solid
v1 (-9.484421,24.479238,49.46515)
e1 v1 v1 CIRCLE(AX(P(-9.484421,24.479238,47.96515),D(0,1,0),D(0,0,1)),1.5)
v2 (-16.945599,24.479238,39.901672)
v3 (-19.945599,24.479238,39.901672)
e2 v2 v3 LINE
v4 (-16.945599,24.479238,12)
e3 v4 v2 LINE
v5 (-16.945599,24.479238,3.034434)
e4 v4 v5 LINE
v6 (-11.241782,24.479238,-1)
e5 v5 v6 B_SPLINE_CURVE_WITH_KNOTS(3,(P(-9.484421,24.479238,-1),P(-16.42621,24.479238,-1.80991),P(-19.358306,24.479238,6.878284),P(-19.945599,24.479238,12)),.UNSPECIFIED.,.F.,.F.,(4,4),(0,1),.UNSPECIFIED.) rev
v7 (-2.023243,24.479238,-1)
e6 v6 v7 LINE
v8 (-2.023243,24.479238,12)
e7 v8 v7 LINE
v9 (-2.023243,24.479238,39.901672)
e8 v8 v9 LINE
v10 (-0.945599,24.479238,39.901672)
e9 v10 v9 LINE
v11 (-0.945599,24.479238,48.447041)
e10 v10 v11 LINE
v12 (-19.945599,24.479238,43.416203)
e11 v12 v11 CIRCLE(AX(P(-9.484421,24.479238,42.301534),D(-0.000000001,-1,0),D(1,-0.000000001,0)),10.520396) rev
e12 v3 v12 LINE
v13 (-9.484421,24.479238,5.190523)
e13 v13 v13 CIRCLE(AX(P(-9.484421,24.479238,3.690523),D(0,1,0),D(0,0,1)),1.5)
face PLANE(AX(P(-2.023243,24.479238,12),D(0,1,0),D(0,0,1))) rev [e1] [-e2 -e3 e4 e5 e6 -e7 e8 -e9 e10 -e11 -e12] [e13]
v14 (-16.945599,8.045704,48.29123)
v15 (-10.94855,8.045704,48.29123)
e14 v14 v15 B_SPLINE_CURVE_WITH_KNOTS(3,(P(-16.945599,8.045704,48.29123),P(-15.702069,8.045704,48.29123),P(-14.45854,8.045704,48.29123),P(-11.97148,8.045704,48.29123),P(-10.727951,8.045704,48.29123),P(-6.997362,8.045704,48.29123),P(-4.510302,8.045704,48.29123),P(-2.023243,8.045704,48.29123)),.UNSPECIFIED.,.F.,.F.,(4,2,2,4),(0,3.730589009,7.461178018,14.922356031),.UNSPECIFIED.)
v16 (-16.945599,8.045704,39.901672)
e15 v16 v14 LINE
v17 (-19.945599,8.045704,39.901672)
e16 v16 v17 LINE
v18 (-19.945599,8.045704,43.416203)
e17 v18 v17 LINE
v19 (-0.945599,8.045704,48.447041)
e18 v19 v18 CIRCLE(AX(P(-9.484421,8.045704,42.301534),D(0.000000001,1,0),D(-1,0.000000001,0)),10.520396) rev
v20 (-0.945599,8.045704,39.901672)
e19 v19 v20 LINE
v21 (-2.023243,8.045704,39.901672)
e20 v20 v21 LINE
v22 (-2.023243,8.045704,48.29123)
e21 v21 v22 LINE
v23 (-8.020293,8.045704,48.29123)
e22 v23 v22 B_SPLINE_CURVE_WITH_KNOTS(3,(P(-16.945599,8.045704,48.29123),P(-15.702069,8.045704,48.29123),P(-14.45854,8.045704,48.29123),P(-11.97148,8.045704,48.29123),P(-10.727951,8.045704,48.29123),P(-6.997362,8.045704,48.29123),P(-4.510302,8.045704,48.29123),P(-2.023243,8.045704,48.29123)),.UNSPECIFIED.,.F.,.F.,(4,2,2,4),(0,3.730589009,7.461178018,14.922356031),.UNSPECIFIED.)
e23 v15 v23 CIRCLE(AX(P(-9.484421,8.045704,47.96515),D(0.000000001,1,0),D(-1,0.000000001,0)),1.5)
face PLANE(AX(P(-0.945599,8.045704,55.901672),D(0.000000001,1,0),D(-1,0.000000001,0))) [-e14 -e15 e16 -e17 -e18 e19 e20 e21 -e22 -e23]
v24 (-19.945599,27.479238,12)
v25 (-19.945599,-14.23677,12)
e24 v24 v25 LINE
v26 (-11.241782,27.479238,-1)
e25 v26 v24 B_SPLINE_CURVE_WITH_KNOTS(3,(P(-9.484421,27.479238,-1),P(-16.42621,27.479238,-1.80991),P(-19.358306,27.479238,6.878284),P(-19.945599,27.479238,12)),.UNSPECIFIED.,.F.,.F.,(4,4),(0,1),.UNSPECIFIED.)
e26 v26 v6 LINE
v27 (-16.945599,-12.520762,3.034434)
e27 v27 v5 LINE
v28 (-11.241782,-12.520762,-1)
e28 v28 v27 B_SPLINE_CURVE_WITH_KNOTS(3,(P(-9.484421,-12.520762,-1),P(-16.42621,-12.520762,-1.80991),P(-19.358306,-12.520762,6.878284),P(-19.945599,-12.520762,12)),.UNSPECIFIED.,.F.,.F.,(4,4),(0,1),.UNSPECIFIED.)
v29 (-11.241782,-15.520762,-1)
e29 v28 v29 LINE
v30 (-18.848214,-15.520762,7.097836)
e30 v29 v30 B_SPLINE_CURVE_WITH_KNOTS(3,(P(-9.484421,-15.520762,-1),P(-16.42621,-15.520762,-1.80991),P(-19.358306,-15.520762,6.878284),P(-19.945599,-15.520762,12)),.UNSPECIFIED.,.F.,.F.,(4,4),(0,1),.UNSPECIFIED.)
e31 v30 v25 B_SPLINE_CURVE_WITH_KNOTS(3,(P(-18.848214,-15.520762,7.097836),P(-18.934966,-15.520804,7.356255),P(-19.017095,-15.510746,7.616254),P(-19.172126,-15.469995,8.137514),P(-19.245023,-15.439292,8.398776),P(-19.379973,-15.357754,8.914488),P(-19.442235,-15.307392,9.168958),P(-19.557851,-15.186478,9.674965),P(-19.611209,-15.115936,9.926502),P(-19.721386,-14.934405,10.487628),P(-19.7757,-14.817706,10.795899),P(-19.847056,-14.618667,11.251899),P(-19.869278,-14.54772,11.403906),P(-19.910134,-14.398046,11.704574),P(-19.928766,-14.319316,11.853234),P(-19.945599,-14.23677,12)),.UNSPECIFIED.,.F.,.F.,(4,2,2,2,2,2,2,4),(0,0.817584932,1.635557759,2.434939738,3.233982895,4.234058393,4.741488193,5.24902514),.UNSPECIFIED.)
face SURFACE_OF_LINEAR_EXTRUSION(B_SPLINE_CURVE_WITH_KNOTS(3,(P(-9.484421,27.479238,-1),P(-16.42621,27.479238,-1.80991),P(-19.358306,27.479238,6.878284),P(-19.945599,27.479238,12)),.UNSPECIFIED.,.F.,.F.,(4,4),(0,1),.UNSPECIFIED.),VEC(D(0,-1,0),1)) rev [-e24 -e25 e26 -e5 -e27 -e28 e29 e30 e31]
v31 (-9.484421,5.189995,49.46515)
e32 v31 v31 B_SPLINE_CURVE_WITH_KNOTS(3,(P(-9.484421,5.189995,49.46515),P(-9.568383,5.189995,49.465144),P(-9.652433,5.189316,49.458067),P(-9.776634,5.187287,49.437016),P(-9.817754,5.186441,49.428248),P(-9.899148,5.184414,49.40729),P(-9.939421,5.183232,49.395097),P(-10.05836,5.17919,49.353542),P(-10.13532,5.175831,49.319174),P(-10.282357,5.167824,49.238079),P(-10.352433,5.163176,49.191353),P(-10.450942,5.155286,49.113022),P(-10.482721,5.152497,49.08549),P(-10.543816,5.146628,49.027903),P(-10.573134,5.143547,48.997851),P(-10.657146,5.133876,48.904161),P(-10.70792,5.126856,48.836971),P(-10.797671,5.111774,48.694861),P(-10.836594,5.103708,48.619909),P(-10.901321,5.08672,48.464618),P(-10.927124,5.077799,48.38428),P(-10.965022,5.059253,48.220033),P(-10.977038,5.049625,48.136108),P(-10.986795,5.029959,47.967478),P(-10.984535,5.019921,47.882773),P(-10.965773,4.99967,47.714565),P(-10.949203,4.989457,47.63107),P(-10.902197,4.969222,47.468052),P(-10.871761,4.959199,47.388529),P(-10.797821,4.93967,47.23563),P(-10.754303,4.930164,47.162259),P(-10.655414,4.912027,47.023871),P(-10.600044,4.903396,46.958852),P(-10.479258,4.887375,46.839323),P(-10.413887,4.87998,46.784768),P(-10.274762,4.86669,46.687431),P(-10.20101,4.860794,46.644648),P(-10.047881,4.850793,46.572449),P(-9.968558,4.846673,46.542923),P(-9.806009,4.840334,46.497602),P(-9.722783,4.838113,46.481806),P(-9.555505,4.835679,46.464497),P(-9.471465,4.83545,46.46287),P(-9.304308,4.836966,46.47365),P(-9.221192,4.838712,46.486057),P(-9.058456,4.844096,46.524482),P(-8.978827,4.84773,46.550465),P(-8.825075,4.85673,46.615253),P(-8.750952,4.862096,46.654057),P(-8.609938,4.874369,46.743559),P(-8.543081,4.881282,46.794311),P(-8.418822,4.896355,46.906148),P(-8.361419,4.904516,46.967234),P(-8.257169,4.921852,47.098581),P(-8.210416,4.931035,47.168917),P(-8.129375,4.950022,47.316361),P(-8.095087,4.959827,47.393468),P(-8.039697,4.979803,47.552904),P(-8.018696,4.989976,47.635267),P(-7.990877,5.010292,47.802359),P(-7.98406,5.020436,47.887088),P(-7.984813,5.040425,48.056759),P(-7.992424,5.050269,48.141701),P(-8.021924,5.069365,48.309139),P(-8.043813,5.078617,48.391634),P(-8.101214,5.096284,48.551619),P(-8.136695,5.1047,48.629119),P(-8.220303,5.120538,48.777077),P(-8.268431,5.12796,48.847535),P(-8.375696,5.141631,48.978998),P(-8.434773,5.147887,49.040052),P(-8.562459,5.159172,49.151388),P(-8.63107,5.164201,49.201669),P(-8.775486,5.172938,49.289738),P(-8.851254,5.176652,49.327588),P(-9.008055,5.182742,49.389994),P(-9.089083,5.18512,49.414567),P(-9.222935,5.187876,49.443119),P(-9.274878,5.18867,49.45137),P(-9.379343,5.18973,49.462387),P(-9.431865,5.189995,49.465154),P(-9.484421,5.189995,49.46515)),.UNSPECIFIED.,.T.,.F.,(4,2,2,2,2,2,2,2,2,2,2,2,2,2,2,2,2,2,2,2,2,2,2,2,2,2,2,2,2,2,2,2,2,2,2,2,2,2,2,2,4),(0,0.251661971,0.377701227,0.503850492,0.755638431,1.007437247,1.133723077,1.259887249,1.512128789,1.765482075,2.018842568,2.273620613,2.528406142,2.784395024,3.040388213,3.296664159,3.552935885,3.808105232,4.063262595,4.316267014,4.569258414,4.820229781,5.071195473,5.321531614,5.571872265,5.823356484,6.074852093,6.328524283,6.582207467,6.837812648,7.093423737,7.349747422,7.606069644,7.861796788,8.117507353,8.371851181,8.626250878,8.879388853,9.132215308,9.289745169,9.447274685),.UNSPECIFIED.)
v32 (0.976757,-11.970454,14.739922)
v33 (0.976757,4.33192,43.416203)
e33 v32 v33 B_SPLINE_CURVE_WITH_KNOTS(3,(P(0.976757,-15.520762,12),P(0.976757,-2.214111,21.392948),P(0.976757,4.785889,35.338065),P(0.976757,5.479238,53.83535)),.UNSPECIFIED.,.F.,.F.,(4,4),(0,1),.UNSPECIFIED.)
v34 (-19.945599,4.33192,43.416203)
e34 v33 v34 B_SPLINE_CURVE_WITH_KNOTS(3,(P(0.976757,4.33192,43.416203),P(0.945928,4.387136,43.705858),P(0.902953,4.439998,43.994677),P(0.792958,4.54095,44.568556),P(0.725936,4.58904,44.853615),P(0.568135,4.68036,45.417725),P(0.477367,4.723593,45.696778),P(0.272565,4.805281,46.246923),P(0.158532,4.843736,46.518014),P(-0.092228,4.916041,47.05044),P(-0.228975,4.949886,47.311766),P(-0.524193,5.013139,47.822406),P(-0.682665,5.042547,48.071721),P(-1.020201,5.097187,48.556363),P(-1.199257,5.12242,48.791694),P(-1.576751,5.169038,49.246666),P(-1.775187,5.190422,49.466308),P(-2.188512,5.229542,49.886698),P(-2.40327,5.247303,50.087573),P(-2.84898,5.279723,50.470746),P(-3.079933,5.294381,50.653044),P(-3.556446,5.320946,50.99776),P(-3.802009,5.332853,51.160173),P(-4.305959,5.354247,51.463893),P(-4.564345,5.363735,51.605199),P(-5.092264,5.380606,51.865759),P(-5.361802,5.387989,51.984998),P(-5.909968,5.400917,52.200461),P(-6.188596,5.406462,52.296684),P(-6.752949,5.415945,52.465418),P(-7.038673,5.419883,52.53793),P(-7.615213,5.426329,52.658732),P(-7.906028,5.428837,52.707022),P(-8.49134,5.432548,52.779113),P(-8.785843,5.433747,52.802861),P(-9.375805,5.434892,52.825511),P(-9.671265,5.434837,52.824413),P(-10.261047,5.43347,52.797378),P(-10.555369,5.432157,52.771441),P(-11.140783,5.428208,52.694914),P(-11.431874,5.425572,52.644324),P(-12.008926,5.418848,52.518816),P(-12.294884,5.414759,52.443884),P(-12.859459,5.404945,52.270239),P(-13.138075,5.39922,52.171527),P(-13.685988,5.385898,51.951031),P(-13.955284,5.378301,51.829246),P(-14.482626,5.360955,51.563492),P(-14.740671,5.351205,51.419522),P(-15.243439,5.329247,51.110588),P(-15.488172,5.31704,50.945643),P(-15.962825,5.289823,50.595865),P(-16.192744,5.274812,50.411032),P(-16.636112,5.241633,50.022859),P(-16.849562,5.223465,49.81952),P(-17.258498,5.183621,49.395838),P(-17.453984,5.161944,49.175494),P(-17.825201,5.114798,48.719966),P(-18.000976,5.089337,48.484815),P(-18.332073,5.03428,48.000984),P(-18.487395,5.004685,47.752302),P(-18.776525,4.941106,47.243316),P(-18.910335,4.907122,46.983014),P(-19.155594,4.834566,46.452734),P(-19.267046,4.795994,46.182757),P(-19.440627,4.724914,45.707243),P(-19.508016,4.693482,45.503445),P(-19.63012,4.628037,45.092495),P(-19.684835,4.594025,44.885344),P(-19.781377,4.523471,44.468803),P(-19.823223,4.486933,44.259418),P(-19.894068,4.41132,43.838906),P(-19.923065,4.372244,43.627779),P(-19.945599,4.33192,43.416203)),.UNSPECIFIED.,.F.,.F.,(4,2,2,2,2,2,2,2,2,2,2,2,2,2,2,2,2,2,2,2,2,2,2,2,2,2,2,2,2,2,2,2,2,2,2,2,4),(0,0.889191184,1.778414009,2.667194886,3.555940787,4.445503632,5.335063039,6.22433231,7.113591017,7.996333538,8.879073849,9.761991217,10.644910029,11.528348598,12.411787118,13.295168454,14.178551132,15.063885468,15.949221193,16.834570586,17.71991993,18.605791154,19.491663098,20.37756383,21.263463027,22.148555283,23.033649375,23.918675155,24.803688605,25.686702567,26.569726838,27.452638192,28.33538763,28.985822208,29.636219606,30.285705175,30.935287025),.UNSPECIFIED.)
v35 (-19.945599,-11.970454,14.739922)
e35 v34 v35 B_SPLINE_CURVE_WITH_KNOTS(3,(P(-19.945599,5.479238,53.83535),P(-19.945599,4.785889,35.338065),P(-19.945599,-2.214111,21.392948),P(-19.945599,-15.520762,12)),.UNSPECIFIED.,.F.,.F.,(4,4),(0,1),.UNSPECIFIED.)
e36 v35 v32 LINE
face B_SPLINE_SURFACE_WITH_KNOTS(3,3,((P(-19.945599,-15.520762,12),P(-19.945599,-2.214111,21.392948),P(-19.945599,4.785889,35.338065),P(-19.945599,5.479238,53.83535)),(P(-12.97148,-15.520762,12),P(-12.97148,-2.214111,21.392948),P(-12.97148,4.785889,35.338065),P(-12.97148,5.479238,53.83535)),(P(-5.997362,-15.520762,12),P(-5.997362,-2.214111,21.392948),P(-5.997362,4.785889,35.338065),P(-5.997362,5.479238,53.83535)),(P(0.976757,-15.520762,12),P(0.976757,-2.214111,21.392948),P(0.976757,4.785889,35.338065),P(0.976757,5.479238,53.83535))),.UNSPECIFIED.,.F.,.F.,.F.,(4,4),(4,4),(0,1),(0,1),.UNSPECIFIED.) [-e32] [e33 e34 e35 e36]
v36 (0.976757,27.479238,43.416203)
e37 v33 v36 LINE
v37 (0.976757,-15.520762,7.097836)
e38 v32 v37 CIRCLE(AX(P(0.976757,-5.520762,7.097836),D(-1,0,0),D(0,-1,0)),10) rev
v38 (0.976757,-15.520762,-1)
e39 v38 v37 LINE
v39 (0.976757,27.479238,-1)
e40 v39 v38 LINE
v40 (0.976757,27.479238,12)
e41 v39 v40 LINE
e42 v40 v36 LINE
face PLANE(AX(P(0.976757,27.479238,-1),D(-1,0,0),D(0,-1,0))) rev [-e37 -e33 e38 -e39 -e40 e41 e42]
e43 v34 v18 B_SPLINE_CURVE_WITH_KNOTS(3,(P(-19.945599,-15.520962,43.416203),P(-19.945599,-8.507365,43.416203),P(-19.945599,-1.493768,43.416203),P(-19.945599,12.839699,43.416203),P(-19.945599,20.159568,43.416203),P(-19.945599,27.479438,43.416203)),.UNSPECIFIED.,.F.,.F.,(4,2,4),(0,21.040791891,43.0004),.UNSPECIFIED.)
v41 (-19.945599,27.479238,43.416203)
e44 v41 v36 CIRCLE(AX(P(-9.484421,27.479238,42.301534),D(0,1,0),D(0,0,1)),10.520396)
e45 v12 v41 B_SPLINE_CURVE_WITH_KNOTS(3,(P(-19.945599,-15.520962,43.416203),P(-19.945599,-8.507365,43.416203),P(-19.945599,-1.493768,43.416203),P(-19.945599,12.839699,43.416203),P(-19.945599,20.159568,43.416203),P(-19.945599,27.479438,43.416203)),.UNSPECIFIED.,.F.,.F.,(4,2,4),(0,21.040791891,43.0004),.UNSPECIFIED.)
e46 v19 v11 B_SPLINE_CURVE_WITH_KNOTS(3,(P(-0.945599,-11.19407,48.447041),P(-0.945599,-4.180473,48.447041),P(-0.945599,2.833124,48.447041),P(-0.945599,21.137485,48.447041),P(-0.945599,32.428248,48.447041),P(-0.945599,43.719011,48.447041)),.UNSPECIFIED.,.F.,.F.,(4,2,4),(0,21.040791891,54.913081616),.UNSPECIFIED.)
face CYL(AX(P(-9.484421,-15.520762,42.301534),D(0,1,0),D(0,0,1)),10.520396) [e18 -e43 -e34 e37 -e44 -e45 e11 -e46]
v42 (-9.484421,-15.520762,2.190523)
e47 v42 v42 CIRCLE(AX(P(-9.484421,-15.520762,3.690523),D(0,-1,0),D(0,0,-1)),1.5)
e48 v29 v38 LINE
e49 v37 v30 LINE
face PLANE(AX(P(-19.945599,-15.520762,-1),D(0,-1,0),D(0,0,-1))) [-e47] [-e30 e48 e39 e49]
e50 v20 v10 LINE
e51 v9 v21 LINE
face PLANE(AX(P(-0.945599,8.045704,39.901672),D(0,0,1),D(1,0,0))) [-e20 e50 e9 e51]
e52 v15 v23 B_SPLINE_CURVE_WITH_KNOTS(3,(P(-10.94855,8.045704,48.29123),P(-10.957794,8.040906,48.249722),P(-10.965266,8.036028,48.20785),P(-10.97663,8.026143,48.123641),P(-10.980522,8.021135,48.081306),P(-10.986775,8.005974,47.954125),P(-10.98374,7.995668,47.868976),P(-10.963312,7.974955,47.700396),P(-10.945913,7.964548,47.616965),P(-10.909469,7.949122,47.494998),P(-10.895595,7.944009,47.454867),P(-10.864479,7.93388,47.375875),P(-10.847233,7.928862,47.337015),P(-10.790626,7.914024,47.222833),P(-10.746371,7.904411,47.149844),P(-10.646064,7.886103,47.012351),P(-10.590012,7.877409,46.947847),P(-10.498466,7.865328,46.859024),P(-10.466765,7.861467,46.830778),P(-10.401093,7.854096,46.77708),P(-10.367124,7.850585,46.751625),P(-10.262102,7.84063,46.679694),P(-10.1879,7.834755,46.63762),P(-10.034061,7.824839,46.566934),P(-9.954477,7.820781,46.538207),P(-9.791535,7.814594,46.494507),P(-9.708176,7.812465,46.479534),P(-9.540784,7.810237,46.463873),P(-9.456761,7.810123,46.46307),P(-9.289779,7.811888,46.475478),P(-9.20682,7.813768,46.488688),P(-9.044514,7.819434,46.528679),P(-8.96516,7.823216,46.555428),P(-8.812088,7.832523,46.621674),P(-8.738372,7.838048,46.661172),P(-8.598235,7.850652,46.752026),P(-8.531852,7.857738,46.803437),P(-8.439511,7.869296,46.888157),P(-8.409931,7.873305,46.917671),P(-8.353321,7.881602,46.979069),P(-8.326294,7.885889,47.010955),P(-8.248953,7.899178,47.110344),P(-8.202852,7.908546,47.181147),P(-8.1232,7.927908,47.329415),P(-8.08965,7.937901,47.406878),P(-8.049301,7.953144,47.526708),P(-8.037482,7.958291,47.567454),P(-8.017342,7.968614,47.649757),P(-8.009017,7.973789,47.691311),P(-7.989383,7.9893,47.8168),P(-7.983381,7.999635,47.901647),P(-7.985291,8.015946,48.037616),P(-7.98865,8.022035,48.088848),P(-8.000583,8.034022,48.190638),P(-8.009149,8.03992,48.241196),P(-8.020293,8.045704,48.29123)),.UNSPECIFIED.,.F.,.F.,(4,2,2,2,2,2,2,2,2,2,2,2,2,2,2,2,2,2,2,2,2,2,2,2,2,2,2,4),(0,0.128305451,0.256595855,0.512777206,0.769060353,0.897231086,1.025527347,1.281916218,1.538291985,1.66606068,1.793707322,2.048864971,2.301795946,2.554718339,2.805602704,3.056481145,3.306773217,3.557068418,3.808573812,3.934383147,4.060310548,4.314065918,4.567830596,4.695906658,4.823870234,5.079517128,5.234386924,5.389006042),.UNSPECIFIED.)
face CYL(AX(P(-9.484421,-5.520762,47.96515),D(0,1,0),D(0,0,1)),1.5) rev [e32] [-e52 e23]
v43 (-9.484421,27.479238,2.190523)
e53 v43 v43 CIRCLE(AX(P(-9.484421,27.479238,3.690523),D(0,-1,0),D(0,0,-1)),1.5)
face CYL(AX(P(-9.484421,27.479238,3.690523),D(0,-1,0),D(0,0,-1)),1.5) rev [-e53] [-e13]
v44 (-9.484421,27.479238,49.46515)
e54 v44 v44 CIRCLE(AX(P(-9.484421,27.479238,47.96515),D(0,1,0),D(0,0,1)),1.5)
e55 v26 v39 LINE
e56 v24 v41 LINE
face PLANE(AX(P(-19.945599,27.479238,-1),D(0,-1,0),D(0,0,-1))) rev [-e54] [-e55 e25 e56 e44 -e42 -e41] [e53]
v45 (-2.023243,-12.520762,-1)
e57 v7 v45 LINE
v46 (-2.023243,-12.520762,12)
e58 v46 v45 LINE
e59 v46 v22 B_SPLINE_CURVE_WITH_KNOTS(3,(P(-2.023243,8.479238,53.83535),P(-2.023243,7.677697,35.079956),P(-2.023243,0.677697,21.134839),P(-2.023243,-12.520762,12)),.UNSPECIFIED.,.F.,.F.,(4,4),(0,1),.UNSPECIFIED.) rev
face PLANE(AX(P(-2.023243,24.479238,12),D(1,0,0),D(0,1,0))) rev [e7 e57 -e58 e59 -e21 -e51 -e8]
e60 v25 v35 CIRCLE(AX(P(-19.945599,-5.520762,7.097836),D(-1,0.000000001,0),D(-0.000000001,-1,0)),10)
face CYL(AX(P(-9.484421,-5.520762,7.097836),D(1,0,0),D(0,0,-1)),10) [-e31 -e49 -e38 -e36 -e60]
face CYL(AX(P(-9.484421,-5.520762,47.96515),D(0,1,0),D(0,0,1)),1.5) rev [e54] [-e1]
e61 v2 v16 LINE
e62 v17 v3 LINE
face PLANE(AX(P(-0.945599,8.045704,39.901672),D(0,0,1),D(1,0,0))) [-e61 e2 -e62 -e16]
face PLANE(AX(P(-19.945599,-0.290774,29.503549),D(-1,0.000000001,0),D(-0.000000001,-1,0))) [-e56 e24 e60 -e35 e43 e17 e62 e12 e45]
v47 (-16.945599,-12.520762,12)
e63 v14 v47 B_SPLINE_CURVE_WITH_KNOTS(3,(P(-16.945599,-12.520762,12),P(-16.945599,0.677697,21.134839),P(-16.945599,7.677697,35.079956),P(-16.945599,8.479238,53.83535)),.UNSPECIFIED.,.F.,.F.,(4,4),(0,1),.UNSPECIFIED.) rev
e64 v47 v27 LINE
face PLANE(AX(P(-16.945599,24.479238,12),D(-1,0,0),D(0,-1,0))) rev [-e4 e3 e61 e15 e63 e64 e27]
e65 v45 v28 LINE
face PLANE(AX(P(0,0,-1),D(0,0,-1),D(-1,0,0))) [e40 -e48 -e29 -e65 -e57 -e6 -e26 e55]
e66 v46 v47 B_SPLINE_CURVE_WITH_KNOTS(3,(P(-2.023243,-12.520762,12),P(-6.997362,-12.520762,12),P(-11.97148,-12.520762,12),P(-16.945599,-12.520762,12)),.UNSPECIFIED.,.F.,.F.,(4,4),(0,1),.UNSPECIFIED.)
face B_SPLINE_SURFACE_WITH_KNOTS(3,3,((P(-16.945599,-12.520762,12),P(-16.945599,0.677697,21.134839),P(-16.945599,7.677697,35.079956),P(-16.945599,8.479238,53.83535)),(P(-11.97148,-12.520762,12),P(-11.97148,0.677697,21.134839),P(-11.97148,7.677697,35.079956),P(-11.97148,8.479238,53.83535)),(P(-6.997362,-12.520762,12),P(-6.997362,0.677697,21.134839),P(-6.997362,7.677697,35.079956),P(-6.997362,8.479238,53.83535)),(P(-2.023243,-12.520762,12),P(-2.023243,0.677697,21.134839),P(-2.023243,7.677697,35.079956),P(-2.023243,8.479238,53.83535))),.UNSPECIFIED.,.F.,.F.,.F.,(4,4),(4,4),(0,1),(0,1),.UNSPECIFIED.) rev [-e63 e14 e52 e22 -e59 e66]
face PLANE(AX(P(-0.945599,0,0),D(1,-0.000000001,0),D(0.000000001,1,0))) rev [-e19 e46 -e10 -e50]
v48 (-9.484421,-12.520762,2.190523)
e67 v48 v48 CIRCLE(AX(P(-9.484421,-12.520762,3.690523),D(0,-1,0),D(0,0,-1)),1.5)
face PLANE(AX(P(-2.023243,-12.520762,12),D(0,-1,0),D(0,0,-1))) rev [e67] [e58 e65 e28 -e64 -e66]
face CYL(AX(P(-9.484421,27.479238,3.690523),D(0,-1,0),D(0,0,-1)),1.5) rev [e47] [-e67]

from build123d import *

# Parameters (mm, degrees)
BOSS_EXTRUDE1_DEPTH      = 12
BOSS_EXTRUDE1_DEPTH_BACK = 1
SKETCH1_W                = 20.922356035
SKETCH1_H                = 43
SKETCH14_W               = 14.922356035
SKETCH14_H               = 37
CUT_EXTRUDE6_DEPTH       = 13
SKETCH15_R               = 1.5
CUT_EXTRUDE10_DEPTH      = 43
LOFT8_START              = -19.945599133
LOFT8_DEPTH              = 20.922356013
CUT_EXTRUDE20_DEPTH      = 43
SKETCH22_W               = 16
SKETCH22_H               = 16.433534057
CUT_EXTRUDE21_DEPTH      = 19
CUT_LOFT2_START          = -16.94559915
CUT_LOFT2_DEPTH          = 14.922356033
SKETCH23_R               = 1.5
CUT_EXTRUDE23_DEPTH      = 33
FILLET1_R                = 10


# Read off the part's stored shape, not the designer's step: Loft8, Cut-Loft2
with BuildPart() as part:
    # Sketch1 → Boss-Extrude1 (new, two sides: drawn at the far end of the back side and taken through both)
    with BuildSketch(Plane.XY.offset(-BOSS_EXTRUDE1_DEPTH_BACK)):
        with Locations((-9.484421134, 5.979237668)):
            Rectangle(SKETCH1_W, SKETCH1_H)
    extrude(amount=BOSS_EXTRUDE1_DEPTH + BOSS_EXTRUDE1_DEPTH_BACK)

    # Sketch14 → Cut-Extrude6 (cut)
    with BuildSketch(Plane(origin=(0, 0, -1), x_dir=(-1, 0, 0), z_dir=(0, 0, -1))):
        with Locations((9.484421134, 5.979237668)):
            Rectangle(SKETCH14_W, SKETCH14_H)
    extrude(amount=-CUT_EXTRUDE6_DEPTH, mode=Mode.SUBTRACT)

    # Sketch15 → Cut-Extrude10 (cut)
    with BuildSketch(Plane.XZ.offset(15.520762332)):
        with Locations(Location((-9.484421134, 3.6905228, 0), (0, 0, 270))):
            Circle(SKETCH15_R)
        with BuildLine():
            add(Edge.make_bspline(
                [(-9.484421134, -1), (-16.426209899, -1.809910236), (-19.358305998, 6.878284344), (-19.945599152, 12)],
                knots=[0, 0, 0, 0, 1, 1, 1, 1], degree=3))
            add(Edge.make_bspline(
                [(-19.945599152, 12), (-50.062585738, -15.871811338), (-9.484421134, -1)],
                knots=[0, 0, 0, 1, 1, 1], degree=2))
        make_face()
    extrude(amount=-CUT_EXTRUDE10_DEPTH, mode=Mode.SUBTRACT)

    # Loft8 outline → Loft8 (add)
    with BuildSketch(Plane.YZ.offset(LOFT8_START)):
        with BuildLine():
            add(Edge.make_bspline(
                [(-15.520762333, 12.000000001), (-2.214111033, 21.392948337), (4.785888967, 35.338065027), (5.479237667, 53.835350068)],
                knots=[0, 0, 0, 0, 1, 1, 1, 1], degree=3))
            Line((-15.520762333, 12.000000001), (-12.520762334, 12))
            Line((-12.520762334, 12), (24.479237668, 12.000000002))
            Line((24.479237668, 12.000000002), (27.479237669, 12))
            Line((27.479237669, 12), (27.479237666, 53.835350069))
            Line((27.479237666, 53.835350069), (5.479237667, 53.835350068))
        make_face()
    extrude(amount=LOFT8_DEPTH)

    # Sketch21 → Cut-Extrude20 (cut)
    with BuildSketch(Plane(origin=(0, 27.479237668, 0), x_dir=(1, 0, 0), z_dir=(0, 1, 0))):
        with BuildLine():
            ThreePointArc((-19.945599152, -41.186866189), (-9.484421134, -52.821930397), (0.976756883, -41.186866189))
            add(Edge.make_bspline(
                [(0.976756883, -41.186866189), (22.088375755, -54.528516897), (-10.313654941, -86.662148681), (-35.550608102, -49.144456459), (-19.945599152, -41.186866189)],
                knots=[0, 0, 0, 0, 0.529728329, 1, 1, 1, 1], degree=3))
        make_face()
    extrude(amount=-CUT_EXTRUDE20_DEPTH, mode=Mode.SUBTRACT)

    # Sketch22 → Cut-Extrude21 (cut)
    with BuildSketch(Plane.ZY.offset(19.94559914)):
        with Locations((47.901671706, 16.262470629)):
            Rectangle(SKETCH22_W, SKETCH22_H)
    extrude(amount=-CUT_EXTRUDE21_DEPTH, mode=Mode.SUBTRACT)

    # Cut-Loft2 outline → Cut-Loft2 (cut)
    with BuildSketch(Plane.YZ.offset(CUT_LOFT2_START)):
        with BuildLine():
            add(Edge.make_bspline(
                [(-12.520762331, 12), (-0.657436898, 20.210774423), (6.198051749, 32.307850958), (8.045703611, 48.291229604)],
                knots=[0, 0, 0, 0, 0.898841703, 0.898841703, 0.898841703, 0.898841703], degree=3))
            Line((-12.520762331, 12), (24.47923767, 12))
            Line((24.47923767, 12), (24.47923767, 39.901671701))
            Line((24.47923767, 39.901671701), (8.045703601, 39.901671701))
            Line((8.045703601, 39.901671701), (8.045703611, 48.291229604))
        make_face()
    extrude(amount=CUT_LOFT2_DEPTH, mode=Mode.SUBTRACT)

    # Sketch23 → Cut-Extrude23 (cut)
    with BuildSketch(Plane(origin=(0, 27.479237668, 0), x_dir=(1, 0, 0), z_dir=(0, 1, 0))):
        with Locations(Location((-9.484421063, -47.965150337, 0), (0, 0, 270))):
            Circle(SKETCH23_R)
    extrude(amount=-CUT_EXTRUDE23_DEPTH, mode=Mode.SUBTRACT)

    # Fillet1
    fillet1_edges = [part.edges().sort_by_distance(p)[0] for p in [
        (-9.484421134, -15.520762332, 12),
    ]]
    fillet(fillet1_edges, radius=FILLET1_R)


solid = part.part
